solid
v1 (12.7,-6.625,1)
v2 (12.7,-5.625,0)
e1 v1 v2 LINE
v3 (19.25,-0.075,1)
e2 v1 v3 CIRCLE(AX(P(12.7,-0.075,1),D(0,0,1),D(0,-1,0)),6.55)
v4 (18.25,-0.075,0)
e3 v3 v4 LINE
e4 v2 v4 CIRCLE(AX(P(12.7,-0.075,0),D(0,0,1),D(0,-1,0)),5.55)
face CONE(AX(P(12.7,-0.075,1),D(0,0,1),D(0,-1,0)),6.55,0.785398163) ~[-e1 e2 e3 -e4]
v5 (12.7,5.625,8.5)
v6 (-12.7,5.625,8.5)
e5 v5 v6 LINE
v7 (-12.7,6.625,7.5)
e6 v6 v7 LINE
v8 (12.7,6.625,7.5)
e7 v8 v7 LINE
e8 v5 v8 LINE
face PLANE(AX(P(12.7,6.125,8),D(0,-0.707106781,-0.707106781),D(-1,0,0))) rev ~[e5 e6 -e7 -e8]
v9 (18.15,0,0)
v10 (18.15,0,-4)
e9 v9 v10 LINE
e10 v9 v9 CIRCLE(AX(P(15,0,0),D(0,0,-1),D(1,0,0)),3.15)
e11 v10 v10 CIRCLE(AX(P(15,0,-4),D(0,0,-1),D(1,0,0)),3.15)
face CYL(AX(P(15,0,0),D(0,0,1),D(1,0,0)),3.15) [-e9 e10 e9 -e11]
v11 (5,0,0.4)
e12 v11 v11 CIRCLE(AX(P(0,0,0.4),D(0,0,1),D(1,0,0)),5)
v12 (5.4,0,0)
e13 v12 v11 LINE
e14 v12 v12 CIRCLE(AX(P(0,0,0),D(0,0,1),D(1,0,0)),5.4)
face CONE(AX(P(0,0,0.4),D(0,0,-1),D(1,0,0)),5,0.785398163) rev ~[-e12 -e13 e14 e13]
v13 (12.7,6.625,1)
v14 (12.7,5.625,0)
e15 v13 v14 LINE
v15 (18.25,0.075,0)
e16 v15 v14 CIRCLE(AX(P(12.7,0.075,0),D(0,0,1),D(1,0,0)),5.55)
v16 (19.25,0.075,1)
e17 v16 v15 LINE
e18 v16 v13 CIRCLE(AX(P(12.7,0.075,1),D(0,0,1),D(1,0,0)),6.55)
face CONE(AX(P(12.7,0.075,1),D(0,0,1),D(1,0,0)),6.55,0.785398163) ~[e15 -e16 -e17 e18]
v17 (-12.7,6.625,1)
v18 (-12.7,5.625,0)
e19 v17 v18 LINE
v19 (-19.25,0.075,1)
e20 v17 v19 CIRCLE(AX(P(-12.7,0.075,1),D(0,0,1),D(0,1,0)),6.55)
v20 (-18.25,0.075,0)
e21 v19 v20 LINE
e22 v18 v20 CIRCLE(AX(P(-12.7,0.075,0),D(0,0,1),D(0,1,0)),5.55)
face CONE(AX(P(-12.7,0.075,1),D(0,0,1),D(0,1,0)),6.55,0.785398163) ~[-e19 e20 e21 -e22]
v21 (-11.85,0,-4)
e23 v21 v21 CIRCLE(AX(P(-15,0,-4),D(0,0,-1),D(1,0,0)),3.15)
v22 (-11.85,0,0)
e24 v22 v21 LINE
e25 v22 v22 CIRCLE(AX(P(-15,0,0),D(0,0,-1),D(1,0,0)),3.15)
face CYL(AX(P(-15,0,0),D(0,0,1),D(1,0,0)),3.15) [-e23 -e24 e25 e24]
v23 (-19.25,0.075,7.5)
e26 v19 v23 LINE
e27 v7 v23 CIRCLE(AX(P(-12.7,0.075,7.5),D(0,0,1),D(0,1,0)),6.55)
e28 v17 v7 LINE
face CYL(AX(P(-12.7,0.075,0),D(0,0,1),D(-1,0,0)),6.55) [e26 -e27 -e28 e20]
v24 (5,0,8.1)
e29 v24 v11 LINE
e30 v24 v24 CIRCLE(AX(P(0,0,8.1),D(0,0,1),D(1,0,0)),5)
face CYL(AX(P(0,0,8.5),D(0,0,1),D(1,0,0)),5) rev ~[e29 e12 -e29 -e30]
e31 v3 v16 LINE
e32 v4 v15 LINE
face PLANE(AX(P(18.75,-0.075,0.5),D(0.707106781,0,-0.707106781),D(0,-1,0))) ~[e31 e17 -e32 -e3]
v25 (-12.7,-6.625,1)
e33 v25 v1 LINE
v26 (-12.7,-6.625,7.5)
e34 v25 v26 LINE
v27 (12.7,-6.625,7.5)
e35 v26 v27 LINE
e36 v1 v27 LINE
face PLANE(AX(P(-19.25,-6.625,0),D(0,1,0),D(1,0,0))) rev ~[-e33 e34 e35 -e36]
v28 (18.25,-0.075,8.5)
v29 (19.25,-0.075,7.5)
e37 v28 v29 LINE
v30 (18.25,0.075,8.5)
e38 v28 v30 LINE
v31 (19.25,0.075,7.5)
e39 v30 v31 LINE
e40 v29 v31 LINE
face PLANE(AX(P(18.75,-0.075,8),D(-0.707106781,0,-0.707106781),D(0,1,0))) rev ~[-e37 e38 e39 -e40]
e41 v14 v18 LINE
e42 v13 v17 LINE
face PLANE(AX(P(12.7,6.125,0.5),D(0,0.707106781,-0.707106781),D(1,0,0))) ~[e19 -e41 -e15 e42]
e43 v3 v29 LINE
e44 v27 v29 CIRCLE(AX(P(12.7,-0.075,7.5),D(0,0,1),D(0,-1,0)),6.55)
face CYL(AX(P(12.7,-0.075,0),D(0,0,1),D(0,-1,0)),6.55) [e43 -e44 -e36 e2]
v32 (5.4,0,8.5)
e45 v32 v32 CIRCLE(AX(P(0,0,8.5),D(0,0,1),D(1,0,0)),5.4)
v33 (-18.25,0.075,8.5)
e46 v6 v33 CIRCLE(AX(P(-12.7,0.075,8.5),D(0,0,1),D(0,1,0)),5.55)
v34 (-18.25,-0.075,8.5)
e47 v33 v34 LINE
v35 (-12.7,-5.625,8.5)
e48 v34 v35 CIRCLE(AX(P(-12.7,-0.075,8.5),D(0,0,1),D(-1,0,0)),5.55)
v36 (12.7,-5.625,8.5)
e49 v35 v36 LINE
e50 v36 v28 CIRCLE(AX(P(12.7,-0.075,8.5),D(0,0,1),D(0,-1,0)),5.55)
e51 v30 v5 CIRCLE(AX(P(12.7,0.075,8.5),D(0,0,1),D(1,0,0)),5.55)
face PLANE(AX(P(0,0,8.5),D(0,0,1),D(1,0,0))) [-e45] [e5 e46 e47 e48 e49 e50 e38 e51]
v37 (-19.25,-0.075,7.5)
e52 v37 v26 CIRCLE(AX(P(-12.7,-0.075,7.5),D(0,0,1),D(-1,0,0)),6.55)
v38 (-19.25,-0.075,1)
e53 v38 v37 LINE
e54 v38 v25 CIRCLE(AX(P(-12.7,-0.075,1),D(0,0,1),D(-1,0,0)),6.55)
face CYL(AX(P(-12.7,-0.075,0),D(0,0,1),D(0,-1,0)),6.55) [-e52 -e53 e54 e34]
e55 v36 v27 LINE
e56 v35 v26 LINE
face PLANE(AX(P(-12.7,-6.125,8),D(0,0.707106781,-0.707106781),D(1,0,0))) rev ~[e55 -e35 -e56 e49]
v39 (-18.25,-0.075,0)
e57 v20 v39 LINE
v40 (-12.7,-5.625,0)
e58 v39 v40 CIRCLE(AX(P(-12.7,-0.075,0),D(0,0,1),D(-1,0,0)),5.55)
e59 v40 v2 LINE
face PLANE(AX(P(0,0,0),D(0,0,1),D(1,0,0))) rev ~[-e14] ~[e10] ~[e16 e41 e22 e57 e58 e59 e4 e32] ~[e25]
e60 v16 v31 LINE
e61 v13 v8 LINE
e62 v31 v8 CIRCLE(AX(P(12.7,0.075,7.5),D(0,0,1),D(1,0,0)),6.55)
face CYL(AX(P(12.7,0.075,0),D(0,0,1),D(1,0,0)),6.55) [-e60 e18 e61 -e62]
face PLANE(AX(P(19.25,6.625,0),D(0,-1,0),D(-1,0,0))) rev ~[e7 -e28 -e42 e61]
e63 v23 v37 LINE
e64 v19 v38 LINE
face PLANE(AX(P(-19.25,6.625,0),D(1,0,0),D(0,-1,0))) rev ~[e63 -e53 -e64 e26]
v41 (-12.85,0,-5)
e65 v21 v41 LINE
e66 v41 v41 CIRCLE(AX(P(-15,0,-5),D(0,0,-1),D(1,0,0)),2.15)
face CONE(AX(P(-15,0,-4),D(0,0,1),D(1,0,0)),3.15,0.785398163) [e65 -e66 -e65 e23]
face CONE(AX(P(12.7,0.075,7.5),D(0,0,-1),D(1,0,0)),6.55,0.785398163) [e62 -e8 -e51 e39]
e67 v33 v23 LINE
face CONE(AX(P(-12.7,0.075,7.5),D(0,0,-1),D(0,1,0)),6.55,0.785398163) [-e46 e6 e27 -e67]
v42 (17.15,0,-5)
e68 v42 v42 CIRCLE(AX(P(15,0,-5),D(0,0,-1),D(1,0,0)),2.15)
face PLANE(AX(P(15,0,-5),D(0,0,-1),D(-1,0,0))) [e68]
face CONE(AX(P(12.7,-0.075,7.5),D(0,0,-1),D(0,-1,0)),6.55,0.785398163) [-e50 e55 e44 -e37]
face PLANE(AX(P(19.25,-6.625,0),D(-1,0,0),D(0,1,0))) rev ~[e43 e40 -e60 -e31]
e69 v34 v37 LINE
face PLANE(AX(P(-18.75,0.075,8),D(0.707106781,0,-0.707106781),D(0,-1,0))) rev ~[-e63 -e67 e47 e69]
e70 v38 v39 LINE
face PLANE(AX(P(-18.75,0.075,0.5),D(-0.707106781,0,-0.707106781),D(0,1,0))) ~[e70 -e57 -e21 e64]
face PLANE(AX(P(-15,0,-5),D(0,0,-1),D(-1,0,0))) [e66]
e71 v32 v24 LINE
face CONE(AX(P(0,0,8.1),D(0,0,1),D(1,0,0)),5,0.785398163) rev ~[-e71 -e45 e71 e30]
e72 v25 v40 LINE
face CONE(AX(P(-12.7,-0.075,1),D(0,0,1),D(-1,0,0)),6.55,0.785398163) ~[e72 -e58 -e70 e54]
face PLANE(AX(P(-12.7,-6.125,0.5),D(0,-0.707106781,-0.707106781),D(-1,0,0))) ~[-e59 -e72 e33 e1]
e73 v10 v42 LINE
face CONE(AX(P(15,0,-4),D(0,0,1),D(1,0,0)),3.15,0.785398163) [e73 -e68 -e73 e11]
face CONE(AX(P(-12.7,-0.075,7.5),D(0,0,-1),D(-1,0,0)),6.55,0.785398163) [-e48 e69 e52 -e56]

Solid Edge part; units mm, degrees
sketch "Sketch1" plane through (0, 0, 0) normal (0, 0, 1) x (1, 0, 0)
  line L0 (-19.25, -6.625) -> (19.25, -6.625)
  line L1 (19.25, -6.625) -> (19.25, 6.625)
  line L2 (19.25, 6.625) -> (-19.25, 6.625)
  line L3 (-19.25, 6.625) -> (-19.25, -6.625)
  dimension "D1" = 38.5
  dimension "D2" = 13.25
extrude "Protrusion1" add sketch "Sketch1" along normal blind 8.5
sketch "Sketch2" plane through (0, 0, 0) normal (0, 0, -1) x (1, 0, 0)
  circle A0 centre (-15, 0) radius 3.15
  circle A1 centre (15, 0) radius 3.15
  dimension "D1" = 6.3
  dimension "D2" = 6.3
extrude "Extrusionsausprägung_2" add sketch "Sketch2" along normal blind 5
fillet "Verrundung_1" radius 6.55 4 edges at (19.25, -6.625, 4.25) (19.25, 6.625, 4.25) (-19.25, -6.625, 4.25) (-19.25, 6.625, 4.25)
sketch "Sketch3" plane through (0, 0, 8.5) normal (0, 0, 1) x (1, 0, 0)
  circle A0 centre (0, 0) radius 5
  dimension "D1" = 10
extrude "Extrusionsausschnitt_2" cut sketch "Sketch3" against normal blind 199.2649
chamfer "Fase_2" distance 1 angle 45 16 edges at (0, 6.625, 8.5) (-17.3315, 4.7065, 8.5) (-19.25, 0, 8.5) (-17.3315, -4.7065, 8.5) (0, -6.625, 8.5) (17.3315, -4.7065, 8.5) (19.25, 0, 8.5) (0, -6.625, 0) (17.3315, -4.7065, 0) (19.25, 0, 0) (0, 6.625, 0) (-17.3315, 4.7065, 0) (-19.25, 0, 0) (-17.3315, -4.7065, 0) (-18.15, 0, -5) (11.85, 0, -5)
chamfer "Fase_3" distance 0.4 angle 45 2 edges at (-5, 0, 0) (-5, 0, 8.5)
